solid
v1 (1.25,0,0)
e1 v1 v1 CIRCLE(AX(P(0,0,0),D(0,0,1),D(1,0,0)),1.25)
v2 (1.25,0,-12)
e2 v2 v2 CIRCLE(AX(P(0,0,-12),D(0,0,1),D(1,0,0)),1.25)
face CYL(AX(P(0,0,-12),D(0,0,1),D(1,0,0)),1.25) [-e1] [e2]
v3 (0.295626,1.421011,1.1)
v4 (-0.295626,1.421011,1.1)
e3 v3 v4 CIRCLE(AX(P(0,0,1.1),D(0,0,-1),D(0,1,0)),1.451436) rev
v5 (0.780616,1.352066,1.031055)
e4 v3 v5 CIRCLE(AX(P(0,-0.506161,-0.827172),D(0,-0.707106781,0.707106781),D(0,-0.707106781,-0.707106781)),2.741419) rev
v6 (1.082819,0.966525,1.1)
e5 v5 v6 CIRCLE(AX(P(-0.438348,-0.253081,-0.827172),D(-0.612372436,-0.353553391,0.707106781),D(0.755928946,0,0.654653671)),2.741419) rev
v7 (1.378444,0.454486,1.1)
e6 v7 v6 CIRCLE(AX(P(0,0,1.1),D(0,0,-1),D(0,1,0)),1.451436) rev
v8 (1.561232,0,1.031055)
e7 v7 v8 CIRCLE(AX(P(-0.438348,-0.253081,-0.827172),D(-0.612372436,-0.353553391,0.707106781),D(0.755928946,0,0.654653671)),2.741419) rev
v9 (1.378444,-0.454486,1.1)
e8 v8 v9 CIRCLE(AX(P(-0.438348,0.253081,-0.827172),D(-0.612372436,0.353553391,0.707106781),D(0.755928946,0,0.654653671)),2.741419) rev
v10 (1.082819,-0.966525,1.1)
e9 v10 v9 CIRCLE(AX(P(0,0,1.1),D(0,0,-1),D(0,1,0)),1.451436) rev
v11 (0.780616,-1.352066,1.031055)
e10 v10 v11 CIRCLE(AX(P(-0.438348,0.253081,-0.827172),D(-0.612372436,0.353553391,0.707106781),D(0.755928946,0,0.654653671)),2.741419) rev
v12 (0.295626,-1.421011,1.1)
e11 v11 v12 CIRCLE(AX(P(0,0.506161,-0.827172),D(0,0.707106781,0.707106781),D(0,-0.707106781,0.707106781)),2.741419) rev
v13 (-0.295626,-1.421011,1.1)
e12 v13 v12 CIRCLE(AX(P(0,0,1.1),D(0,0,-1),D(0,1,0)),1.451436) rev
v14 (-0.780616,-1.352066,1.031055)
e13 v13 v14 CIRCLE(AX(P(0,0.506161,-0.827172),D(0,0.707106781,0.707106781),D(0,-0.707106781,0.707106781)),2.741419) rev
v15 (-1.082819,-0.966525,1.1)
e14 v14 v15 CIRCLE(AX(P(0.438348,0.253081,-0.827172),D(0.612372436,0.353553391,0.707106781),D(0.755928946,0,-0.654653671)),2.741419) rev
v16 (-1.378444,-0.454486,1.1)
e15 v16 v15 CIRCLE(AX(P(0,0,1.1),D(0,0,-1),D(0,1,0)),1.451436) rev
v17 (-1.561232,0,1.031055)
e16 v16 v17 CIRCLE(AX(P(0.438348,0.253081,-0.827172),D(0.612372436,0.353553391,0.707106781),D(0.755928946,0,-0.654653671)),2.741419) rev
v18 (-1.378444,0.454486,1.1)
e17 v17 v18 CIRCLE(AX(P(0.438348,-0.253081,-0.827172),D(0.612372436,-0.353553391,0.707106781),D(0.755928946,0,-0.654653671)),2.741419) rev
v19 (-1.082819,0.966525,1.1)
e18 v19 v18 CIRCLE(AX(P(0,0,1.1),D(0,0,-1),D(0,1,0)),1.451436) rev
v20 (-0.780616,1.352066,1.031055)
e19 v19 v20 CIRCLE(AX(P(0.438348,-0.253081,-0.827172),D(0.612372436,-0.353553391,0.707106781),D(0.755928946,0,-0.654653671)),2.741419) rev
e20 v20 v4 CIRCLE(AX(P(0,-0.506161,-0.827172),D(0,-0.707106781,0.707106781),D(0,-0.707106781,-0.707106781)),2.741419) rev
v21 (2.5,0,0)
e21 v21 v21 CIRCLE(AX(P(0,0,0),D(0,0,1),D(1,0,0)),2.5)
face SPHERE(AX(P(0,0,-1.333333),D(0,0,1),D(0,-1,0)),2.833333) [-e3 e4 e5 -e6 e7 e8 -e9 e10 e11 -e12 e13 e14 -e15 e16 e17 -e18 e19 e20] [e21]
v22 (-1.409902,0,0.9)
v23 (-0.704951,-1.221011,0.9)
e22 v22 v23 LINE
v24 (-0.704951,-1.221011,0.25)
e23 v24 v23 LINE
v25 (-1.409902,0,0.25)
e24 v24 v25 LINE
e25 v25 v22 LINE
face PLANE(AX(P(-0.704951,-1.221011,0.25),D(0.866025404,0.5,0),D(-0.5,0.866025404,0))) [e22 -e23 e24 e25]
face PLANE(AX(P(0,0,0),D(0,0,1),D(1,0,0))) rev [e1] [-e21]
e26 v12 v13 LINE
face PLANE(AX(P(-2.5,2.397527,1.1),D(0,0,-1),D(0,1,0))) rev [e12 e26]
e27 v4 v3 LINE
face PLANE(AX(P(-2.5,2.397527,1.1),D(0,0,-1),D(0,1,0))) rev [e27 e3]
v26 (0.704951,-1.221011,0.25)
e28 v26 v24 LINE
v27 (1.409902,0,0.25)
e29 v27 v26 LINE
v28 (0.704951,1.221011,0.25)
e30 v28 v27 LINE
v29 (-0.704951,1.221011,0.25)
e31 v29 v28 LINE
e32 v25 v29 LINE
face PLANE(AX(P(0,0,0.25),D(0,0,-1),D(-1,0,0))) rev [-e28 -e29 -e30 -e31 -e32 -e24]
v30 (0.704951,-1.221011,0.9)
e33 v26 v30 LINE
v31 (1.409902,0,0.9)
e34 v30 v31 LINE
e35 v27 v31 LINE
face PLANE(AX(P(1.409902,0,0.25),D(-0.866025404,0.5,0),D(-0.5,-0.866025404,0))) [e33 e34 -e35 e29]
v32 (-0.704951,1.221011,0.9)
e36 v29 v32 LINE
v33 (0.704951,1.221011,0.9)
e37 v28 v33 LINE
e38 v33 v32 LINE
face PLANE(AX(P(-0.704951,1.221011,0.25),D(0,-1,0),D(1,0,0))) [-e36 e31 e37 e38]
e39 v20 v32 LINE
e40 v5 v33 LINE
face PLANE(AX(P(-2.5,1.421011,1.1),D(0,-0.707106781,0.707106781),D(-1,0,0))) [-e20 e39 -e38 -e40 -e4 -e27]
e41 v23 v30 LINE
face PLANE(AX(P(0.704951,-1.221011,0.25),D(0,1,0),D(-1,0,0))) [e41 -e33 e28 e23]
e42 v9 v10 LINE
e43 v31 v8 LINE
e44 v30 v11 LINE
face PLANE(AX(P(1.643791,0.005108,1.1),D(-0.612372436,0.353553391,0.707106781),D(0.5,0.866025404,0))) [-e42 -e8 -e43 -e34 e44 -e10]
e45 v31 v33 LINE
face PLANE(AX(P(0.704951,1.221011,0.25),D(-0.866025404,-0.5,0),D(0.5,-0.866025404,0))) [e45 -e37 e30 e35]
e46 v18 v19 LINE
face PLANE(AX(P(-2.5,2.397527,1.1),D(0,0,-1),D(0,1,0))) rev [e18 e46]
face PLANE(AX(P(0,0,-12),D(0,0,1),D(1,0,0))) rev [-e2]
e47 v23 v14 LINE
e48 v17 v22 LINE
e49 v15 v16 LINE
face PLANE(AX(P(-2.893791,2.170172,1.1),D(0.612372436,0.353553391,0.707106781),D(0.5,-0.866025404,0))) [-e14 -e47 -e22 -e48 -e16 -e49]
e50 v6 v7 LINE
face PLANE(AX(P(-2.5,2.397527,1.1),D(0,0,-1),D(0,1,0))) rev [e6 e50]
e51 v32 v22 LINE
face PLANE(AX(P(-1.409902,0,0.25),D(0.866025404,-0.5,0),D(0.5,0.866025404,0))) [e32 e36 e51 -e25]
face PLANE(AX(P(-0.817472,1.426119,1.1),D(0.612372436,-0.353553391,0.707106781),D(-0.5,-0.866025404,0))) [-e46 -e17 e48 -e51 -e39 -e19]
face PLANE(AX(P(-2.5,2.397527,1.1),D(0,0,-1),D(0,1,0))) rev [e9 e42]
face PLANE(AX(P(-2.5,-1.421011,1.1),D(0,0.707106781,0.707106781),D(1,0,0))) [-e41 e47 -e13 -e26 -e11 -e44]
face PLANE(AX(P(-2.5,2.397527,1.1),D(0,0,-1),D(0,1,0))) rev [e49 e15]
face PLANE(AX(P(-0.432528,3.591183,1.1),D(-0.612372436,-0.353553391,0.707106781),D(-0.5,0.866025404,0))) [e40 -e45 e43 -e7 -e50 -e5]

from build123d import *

# Parameters (mm, degrees)
SKETCH1_R               = 1.25
BOSS_EXTRUDE1_DEPTH     = 12
CUT_EXTRUDE1_DEPTH      = 1.25
CUT_EXTRUDE2_DEPTH      = 13.509996003
CUT_EXTRUDE2_DEPTH_BACK = 13.509996003
SKETCH6_W               = 1.249656436
SKETCH6_H               = 4.384153796
CHAMFER2_SIZE           = 0.2


with BuildPart() as part:
    # Sketch1 → Boss-Extrude1 (new body)
    with BuildSketch(Plane.XY):
        Circle(SKETCH1_R)
    extrude(amount=-BOSS_EXTRUDE1_DEPTH)

    # Sketch3 → Revolve1 (revolve)
    with BuildSketch(Plane(origin=(0, 0, 0), x_dir=(0, 0, -1), z_dir=(1, 0, 0)), mode=Mode.PRIVATE) as revolve1_sk:
        with BuildLine():
            ThreePointArc((-1.5, 0), (-1.096229956, 1.457737974), (0, 2.5))
            Line((0, 2.5), (0, 0))
            Line((0, 0), (-1.5, 0))
        make_face()
    revolve(revolve1_sk.sketch.rotate(Axis((0, 0, 1.5), (0, 0, -1)), 180), axis=Axis((0, 0, 1.5), (0, 0, -1)))

    # Sketch5 → Cut-Extrude1 (cut)
    with BuildSketch(Plane(origin=(0, 0, 1.5), x_dir=(-1, 0, 0), z_dir=(0, 0, -1))):
        Polygon((-1.409901945, 0), (-0.704950973, -1.221010901), (0.704950973, -1.221010901), (1.409901945, 0), (0.704950973, 1.221010901), (-0.704950973, 1.221010901), align=None)
    extrude(amount=CUT_EXTRUDE1_DEPTH, mode=Mode.SUBTRACT)

    # Sketch6 → Cut-Extrude2 (cut, two sides: drawn at the far end of the back side and taken through both)
    with BuildSketch(Plane(origin=(0, 0, 0), x_dir=(0, 0, -1), z_dir=(1, 0, 0)).offset(-CUT_EXTRUDE2_DEPTH_BACK)):
        with Locations((-1.724828218, 0.205450463)):
            Rectangle(SKETCH6_W, SKETCH6_H)
    extrude(amount=CUT_EXTRUDE2_DEPTH + CUT_EXTRUDE2_DEPTH_BACK, mode=Mode.SUBTRACT)

    # Chamfer2
    # the kernel refuses this chamfer: 0.2 mm, written as the material it takes off along each edge
    with BuildSketch(Plane(origin=(1.21928757, 1.221010901, 1.1), x_dir=(1.0390370186618431e-14, 0.9996219169112966, 0.02749587661058733), z_dir=(-1, 0, 0))) as chamfer2_piece_1_section:
        Polygon((CHAMFER2_SIZE * 0.999621916911, CHAMFER2_SIZE * 0.0274958766106), (-CHAMFER2_SIZE * 0.0274958766106, CHAMFER2_SIZE * 0.999621916911), (0, 0), align=None)
    chamfer2_piece_1 = extrude(amount=2.43857514, mode=Mode.PRIVATE)
    chamfer2_piece_1 = split(chamfer2_piece_1, bisect_by=Plane(origin=(0.501104512, 1.574083329, 1.032865614), z_dir=(-0.8660254037844416, -0.49999999999999495, 0)), keep=Keep.TOP, mode=Mode.PRIVATE)
    chamfer2_piece_1 = split(chamfer2_piece_1, bisect_by=Plane(origin=(-0.501104512, 1.574083329, 1.032865614), z_dir=(0.8660254037844347, -0.500000000000007, 0)), keep=Keep.TOP, mode=Mode.PRIVATE)
    add(chamfer2_piece_1, mode=Mode.SUBTRACT)
    with BuildSketch(Plane(origin=(1.667070244, -0.44542856, 1.1), x_dir=(0.8656979742248833, 0.4998109584556433, 0.027495876610586282), z_dir=(-0.49999999999999495, 0.8660254037844416, 0))) as chamfer2_piece_2_section:
        Polygon((CHAMFER2_SIZE * 0.999621916911, CHAMFER2_SIZE * 0.0274958766106), (-CHAMFER2_SIZE * 0.0274958766106, CHAMFER2_SIZE * 0.999621916911), (0, 0), align=None)
    chamfer2_piece_2 = extrude(amount=2.43857514, mode=Mode.PRIVATE)
    chamfer2_piece_2 = split(chamfer2_piece_2, bisect_by=Plane(origin=(1.613748406, 0.353072427, 1.032865614), z_dir=(-0.8660254037844382, 0.500000000000001, 0)), keep=Keep.TOP, mode=Mode.PRIVATE)
    chamfer2_piece_2 = split(chamfer2_piece_2, bisect_by=Plane(origin=(1.112643894, 1.221010901, 1.032865614), z_dir=(0, -1, 0)), keep=Keep.TOP, mode=Mode.PRIVATE)
    add(chamfer2_piece_2, mode=Mode.SUBTRACT)
    with BuildSketch(Plane(origin=(0.447782674, -1.666439461, 1.1), x_dir=(0.8656979742248797, -0.4998109584556493, 0.02749587661058626), z_dir=(0.500000000000001, 0.8660254037844382, 0))) as chamfer2_piece_3_section:
        Polygon((CHAMFER2_SIZE * 0.999621916911, CHAMFER2_SIZE * 0.0274958766106), (-CHAMFER2_SIZE * 0.0274958766106, CHAMFER2_SIZE * 0.999621916911), (0, 0), align=None)
    chamfer2_piece_3 = extrude(amount=2.43857514, mode=Mode.PRIVATE)
    chamfer2_piece_3 = split(chamfer2_piece_3, bisect_by=Plane(origin=(1.112643894, -1.221010901, 1.032865614), z_dir=(0, 1, 0)), keep=Keep.TOP, mode=Mode.PRIVATE)
    chamfer2_piece_3 = split(chamfer2_piece_3, bisect_by=Plane(origin=(1.613748406, -0.353072427, 1.032865614), z_dir=(-0.8660254037844416, -0.49999999999999495, 0)), keep=Keep.TOP, mode=Mode.PRIVATE)
    add(chamfer2_piece_3, mode=Mode.SUBTRACT)
    with BuildSketch(Plane(origin=(-1.21928757, -1.221010901, 1.1), x_dir=(-3.30602687756041e-15, -0.9996219169112968, 0.027495876610586285), z_dir=(1, 0, 0))) as chamfer2_piece_4_section:
        Polygon((CHAMFER2_SIZE * 0.999621916911, CHAMFER2_SIZE * 0.0274958766106), (-CHAMFER2_SIZE * 0.0274958766106, CHAMFER2_SIZE * 0.999621916911), (0, 0), align=None)
    chamfer2_piece_4 = extrude(amount=2.43857514, mode=Mode.PRIVATE)
    chamfer2_piece_4 = split(chamfer2_piece_4, bisect_by=Plane(origin=(-0.501104512, -1.574083329, 1.032865614), z_dir=(0.8660254037844417, 0.49999999999999484, 0)), keep=Keep.TOP, mode=Mode.PRIVATE)
    chamfer2_piece_4 = split(chamfer2_piece_4, bisect_by=Plane(origin=(0.501104512, -1.574083329, 1.032865614), z_dir=(-0.8660254037844382, 0.500000000000001, 0)), keep=Keep.TOP, mode=Mode.PRIVATE)
    add(chamfer2_piece_4, mode=Mode.SUBTRACT)
    with BuildSketch(Plane(origin=(-1.667070244, 0.44542856, 1.1), x_dir=(-0.8656979742248834, -0.4998109584556432, 0.027495876610586265), z_dir=(0.49999999999999484, -0.8660254037844417, 0))) as chamfer2_piece_5_section:
        Polygon((CHAMFER2_SIZE * 0.999621916911, CHAMFER2_SIZE * 0.0274958766106), (-CHAMFER2_SIZE * 0.0274958766106, CHAMFER2_SIZE * 0.999621916911), (0, 0), align=None)
    chamfer2_piece_5 = extrude(amount=2.43857514, mode=Mode.PRIVATE)
    chamfer2_piece_5 = split(chamfer2_piece_5, bisect_by=Plane(origin=(-1.112643894, -1.221010901, 1.032865614), z_dir=(0, 1, 0)), keep=Keep.TOP, mode=Mode.PRIVATE)
    chamfer2_piece_5 = split(chamfer2_piece_5, bisect_by=Plane(origin=(-1.613748406, -0.353072427, 1.032865614), z_dir=(0.8660254037844347, -0.500000000000007, 0)), keep=Keep.TOP, mode=Mode.PRIVATE)
    add(chamfer2_piece_5, mode=Mode.SUBTRACT)
    with BuildSketch(Plane(origin=(-0.447782674, 1.666439461, 1.1), x_dir=(-0.8656979742248764, 0.4998109584556554, 0.027495876610586265), z_dir=(-0.500000000000007, -0.8660254037844347, 0))) as chamfer2_piece_6_section:
        Polygon((CHAMFER2_SIZE * 0.999621916911, CHAMFER2_SIZE * 0.0274958766106), (-CHAMFER2_SIZE * 0.0274958766106, CHAMFER2_SIZE * 0.999621916911), (0, 0), align=None)
    chamfer2_piece_6 = extrude(amount=2.43857514, mode=Mode.PRIVATE)
    chamfer2_piece_6 = split(chamfer2_piece_6, bisect_by=Plane(origin=(-1.112643894, 1.221010901, 1.032865614), z_dir=(0, -1, 0)), keep=Keep.TOP, mode=Mode.PRIVATE)
    chamfer2_piece_6 = split(chamfer2_piece_6, bisect_by=Plane(origin=(-1.613748406, 0.353072427, 1.032865614), z_dir=(0.8660254037844417, 0.49999999999999484, 0)), keep=Keep.TOP, mode=Mode.PRIVATE)
    add(chamfer2_piece_6, mode=Mode.SUBTRACT)
    with BuildSketch(Plane(origin=(1.667070244, -0.44542856, 1.1), x_dir=(0.8656979742248833, 0.4998109584556433, 0.027495876610586282), z_dir=(-0.49999999999999495, 0.8660254037844416, 0))) as chamfer2_piece_7a_section:
        Polygon((CHAMFER2_SIZE * 0.999621916911, CHAMFER2_SIZE * 0.0274958766106), (-CHAMFER2_SIZE * 0.0274958766106, CHAMFER2_SIZE * 0.999621916911), (0, 0), align=None)
    chamfer2_piece_7a = extrude(amount=2.43857514, mode=Mode.PRIVATE)
    chamfer2_piece_7a = split(chamfer2_piece_7a, bisect_by=Plane(origin=(0.645691333, 1.221010901, 1.035460513), z_dir=(0, 1, 0)), keep=Keep.TOP, mode=Mode.PRIVATE)
    with BuildSketch(Plane(origin=(1.21928757, 1.221010901, 1.1), x_dir=(1.0390370186618431e-14, 0.9996219169112966, 0.02749587661058733), z_dir=(-1, 0, 0))) as chamfer2_piece_7b_section:
        Polygon((CHAMFER2_SIZE * 0.999621916911, CHAMFER2_SIZE * 0.0274958766106), (-CHAMFER2_SIZE * 0.0274958766106, CHAMFER2_SIZE * 0.999621916911), (0, 0), align=None)
    chamfer2_piece_7b = extrude(amount=2.43857514, mode=Mode.PRIVATE)
    chamfer2_piece_7b = split(chamfer2_piece_7b, bisect_by=Plane(origin=(0.734580793, 1.169690548, 1.035460513), z_dir=(0.8660254037844416, 0.49999999999999495, 0)), keep=Keep.TOP, mode=Mode.PRIVATE)
    chamfer2_piece_7 = chamfer2_piece_7a & chamfer2_piece_7b
    add(chamfer2_piece_7, mode=Mode.SUBTRACT)
    with BuildSketch(Plane(origin=(1.21928757, 1.221010901, 1.1), x_dir=(1.0390370186618431e-14, 0.9996219169112966, 0.02749587661058733), z_dir=(-1, 0, 0))) as chamfer2_piece_8a_section:
        Polygon((CHAMFER2_SIZE * 0.999621916911, CHAMFER2_SIZE * 0.0274958766106), (-CHAMFER2_SIZE * 0.0274958766106, CHAMFER2_SIZE * 0.999621916911), (0, 0), align=None)
    chamfer2_piece_8a = extrude(amount=2.43857514, mode=Mode.PRIVATE)
    chamfer2_piece_8a = split(chamfer2_piece_8a, bisect_by=Plane(origin=(-0.734580793, 1.169690548, 1.035460513), z_dir=(-0.8660254037844347, 0.500000000000007, 0)), keep=Keep.TOP, mode=Mode.PRIVATE)
    with BuildSketch(Plane(origin=(-0.447782674, 1.666439461, 1.1), x_dir=(-0.8656979742248764, 0.4998109584556554, 0.027495876610586265), z_dir=(-0.500000000000007, -0.8660254037844347, 0))) as chamfer2_piece_8b_section:
        Polygon((CHAMFER2_SIZE * 0.999621916911, CHAMFER2_SIZE * 0.0274958766106), (-CHAMFER2_SIZE * 0.0274958766106, CHAMFER2_SIZE * 0.999621916911), (0, 0), align=None)
    chamfer2_piece_8b = extrude(amount=2.43857514, mode=Mode.PRIVATE)
    chamfer2_piece_8b = split(chamfer2_piece_8b, bisect_by=Plane(origin=(-0.645691333, 1.221010901, 1.035460513), z_dir=(0, 1, 0)), keep=Keep.TOP, mode=Mode.PRIVATE)
    chamfer2_piece_8 = chamfer2_piece_8a & chamfer2_piece_8b
    add(chamfer2_piece_8, mode=Mode.SUBTRACT)
    with BuildSketch(Plane(origin=(0.447782674, -1.666439461, 1.1), x_dir=(0.8656979742248797, -0.4998109584556493, 0.02749587661058626), z_dir=(0.500000000000001, 0.8660254037844382, 0))) as chamfer2_piece_9a_section:
        Polygon((CHAMFER2_SIZE * 0.999621916911, CHAMFER2_SIZE * 0.0274958766106), (-CHAMFER2_SIZE * 0.0274958766106, CHAMFER2_SIZE * 0.999621916911), (0, 0), align=None)
    chamfer2_piece_9a = extrude(amount=2.43857514, mode=Mode.PRIVATE)
    chamfer2_piece_9a = split(chamfer2_piece_9a, bisect_by=Plane(origin=(1.380272125, 0.051320354, 1.035460513), z_dir=(0.8660254037844416, 0.49999999999999495, 0)), keep=Keep.TOP, mode=Mode.PRIVATE)
    with BuildSketch(Plane(origin=(1.667070244, -0.44542856, 1.1), x_dir=(0.8656979742248833, 0.4998109584556433, 0.027495876610586282), z_dir=(-0.49999999999999495, 0.8660254037844416, 0))) as chamfer2_piece_9b_section:
        Polygon((CHAMFER2_SIZE * 0.999621916911, CHAMFER2_SIZE * 0.0274958766106), (-CHAMFER2_SIZE * 0.0274958766106, CHAMFER2_SIZE * 0.999621916911), (0, 0), align=None)
    chamfer2_piece_9b = extrude(amount=2.43857514, mode=Mode.PRIVATE)
    chamfer2_piece_9b = split(chamfer2_piece_9b, bisect_by=Plane(origin=(1.380272125, -0.051320354, 1.035460513), z_dir=(0.8660254037844382, -0.500000000000001, 0)), keep=Keep.TOP, mode=Mode.PRIVATE)
    chamfer2_piece_9 = chamfer2_piece_9a & chamfer2_piece_9b
    add(chamfer2_piece_9, mode=Mode.SUBTRACT)
    with BuildSketch(Plane(origin=(-1.21928757, -1.221010901, 1.1), x_dir=(-3.30602687756041e-15, -0.9996219169112968, 0.027495876610586285), z_dir=(1, 0, 0))) as chamfer2_piece_10a_section:
        Polygon((CHAMFER2_SIZE * 0.999621916911, CHAMFER2_SIZE * 0.0274958766106), (-CHAMFER2_SIZE * 0.0274958766106, CHAMFER2_SIZE * 0.999621916911), (0, 0), align=None)
    chamfer2_piece_10a = extrude(amount=2.43857514, mode=Mode.PRIVATE)
    chamfer2_piece_10a = split(chamfer2_piece_10a, bisect_by=Plane(origin=(0.734580793, -1.169690548, 1.035460513), z_dir=(0.8660254037844382, -0.500000000000001, 0)), keep=Keep.TOP, mode=Mode.PRIVATE)
    with BuildSketch(Plane(origin=(0.447782674, -1.666439461, 1.1), x_dir=(0.8656979742248797, -0.4998109584556493, 0.02749587661058626), z_dir=(0.500000000000001, 0.8660254037844382, 0))) as chamfer2_piece_10b_section:
        Polygon((CHAMFER2_SIZE * 0.999621916911, CHAMFER2_SIZE * 0.0274958766106), (-CHAMFER2_SIZE * 0.0274958766106, CHAMFER2_SIZE * 0.999621916911), (0, 0), align=None)
    chamfer2_piece_10b = extrude(amount=2.43857514, mode=Mode.PRIVATE)
    chamfer2_piece_10b = split(chamfer2_piece_10b, bisect_by=Plane(origin=(0.645691333, -1.221010901, 1.035460513), z_dir=(0, -1, 0)), keep=Keep.TOP, mode=Mode.PRIVATE)
    chamfer2_piece_10 = chamfer2_piece_10a & chamfer2_piece_10b
    add(chamfer2_piece_10, mode=Mode.SUBTRACT)
    with BuildSketch(Plane(origin=(-1.21928757, -1.221010901, 1.1), x_dir=(-3.30602687756041e-15, -0.9996219169112968, 0.027495876610586285), z_dir=(1, 0, 0))) as chamfer2_piece_11a_section:
        Polygon((CHAMFER2_SIZE * 0.999621916911, CHAMFER2_SIZE * 0.0274958766106), (-CHAMFER2_SIZE * 0.0274958766106, CHAMFER2_SIZE * 0.999621916911), (0, 0), align=None)
    chamfer2_piece_11a = extrude(amount=2.43857514, mode=Mode.PRIVATE)
    chamfer2_piece_11a = split(chamfer2_piece_11a, bisect_by=Plane(origin=(-0.734580793, -1.169690548, 1.035460513), z_dir=(-0.8660254037844417, -0.49999999999999484, 0)), keep=Keep.TOP, mode=Mode.PRIVATE)
    with BuildSketch(Plane(origin=(-1.667070244, 0.44542856, 1.1), x_dir=(-0.8656979742248834, -0.4998109584556432, 0.027495876610586265), z_dir=(0.49999999999999484, -0.8660254037844417, 0))) as chamfer2_piece_11b_section:
        Polygon((CHAMFER2_SIZE * 0.999621916911, CHAMFER2_SIZE * 0.0274958766106), (-CHAMFER2_SIZE * 0.0274958766106, CHAMFER2_SIZE * 0.999621916911), (0, 0), align=None)
    chamfer2_piece_11b = extrude(amount=2.43857514, mode=Mode.PRIVATE)
    chamfer2_piece_11b = split(chamfer2_piece_11b, bisect_by=Plane(origin=(-0.645691333, -1.221010901, 1.035460513), z_dir=(0, -1, 0)), keep=Keep.TOP, mode=Mode.PRIVATE)
    chamfer2_piece_11 = chamfer2_piece_11a & chamfer2_piece_11b
    add(chamfer2_piece_11, mode=Mode.SUBTRACT)
    with BuildSketch(Plane(origin=(-0.447782674, 1.666439461, 1.1), x_dir=(-0.8656979742248764, 0.4998109584556554, 0.027495876610586265), z_dir=(-0.500000000000007, -0.8660254037844347, 0))) as chamfer2_piece_12a_section:
        Polygon((CHAMFER2_SIZE * 0.999621916911, CHAMFER2_SIZE * 0.0274958766106), (-CHAMFER2_SIZE * 0.0274958766106, CHAMFER2_SIZE * 0.999621916911), (0, 0), align=None)
    chamfer2_piece_12a = extrude(amount=2.43857514, mode=Mode.PRIVATE)
    chamfer2_piece_12a = split(chamfer2_piece_12a, bisect_by=Plane(origin=(-1.380272125, -0.051320354, 1.035460513), z_dir=(-0.8660254037844417, -0.49999999999999484, 0)), keep=Keep.TOP, mode=Mode.PRIVATE)
    with BuildSketch(Plane(origin=(-1.667070244, 0.44542856, 1.1), x_dir=(-0.8656979742248834, -0.4998109584556432, 0.027495876610586265), z_dir=(0.49999999999999484, -0.8660254037844417, 0))) as chamfer2_piece_12b_section:
        Polygon((CHAMFER2_SIZE * 0.999621916911, CHAMFER2_SIZE * 0.0274958766106), (-CHAMFER2_SIZE * 0.0274958766106, CHAMFER2_SIZE * 0.999621916911), (0, 0), align=None)
    chamfer2_piece_12b = extrude(amount=2.43857514, mode=Mode.PRIVATE)
    chamfer2_piece_12b = split(chamfer2_piece_12b, bisect_by=Plane(origin=(-1.380272125, 0.051320354, 1.035460513), z_dir=(-0.8660254037844347, 0.500000000000007, 0)), keep=Keep.TOP, mode=Mode.PRIVATE)
    chamfer2_piece_12 = chamfer2_piece_12a & chamfer2_piece_12b
    add(chamfer2_piece_12, mode=Mode.SUBTRACT)


solid = part.part
